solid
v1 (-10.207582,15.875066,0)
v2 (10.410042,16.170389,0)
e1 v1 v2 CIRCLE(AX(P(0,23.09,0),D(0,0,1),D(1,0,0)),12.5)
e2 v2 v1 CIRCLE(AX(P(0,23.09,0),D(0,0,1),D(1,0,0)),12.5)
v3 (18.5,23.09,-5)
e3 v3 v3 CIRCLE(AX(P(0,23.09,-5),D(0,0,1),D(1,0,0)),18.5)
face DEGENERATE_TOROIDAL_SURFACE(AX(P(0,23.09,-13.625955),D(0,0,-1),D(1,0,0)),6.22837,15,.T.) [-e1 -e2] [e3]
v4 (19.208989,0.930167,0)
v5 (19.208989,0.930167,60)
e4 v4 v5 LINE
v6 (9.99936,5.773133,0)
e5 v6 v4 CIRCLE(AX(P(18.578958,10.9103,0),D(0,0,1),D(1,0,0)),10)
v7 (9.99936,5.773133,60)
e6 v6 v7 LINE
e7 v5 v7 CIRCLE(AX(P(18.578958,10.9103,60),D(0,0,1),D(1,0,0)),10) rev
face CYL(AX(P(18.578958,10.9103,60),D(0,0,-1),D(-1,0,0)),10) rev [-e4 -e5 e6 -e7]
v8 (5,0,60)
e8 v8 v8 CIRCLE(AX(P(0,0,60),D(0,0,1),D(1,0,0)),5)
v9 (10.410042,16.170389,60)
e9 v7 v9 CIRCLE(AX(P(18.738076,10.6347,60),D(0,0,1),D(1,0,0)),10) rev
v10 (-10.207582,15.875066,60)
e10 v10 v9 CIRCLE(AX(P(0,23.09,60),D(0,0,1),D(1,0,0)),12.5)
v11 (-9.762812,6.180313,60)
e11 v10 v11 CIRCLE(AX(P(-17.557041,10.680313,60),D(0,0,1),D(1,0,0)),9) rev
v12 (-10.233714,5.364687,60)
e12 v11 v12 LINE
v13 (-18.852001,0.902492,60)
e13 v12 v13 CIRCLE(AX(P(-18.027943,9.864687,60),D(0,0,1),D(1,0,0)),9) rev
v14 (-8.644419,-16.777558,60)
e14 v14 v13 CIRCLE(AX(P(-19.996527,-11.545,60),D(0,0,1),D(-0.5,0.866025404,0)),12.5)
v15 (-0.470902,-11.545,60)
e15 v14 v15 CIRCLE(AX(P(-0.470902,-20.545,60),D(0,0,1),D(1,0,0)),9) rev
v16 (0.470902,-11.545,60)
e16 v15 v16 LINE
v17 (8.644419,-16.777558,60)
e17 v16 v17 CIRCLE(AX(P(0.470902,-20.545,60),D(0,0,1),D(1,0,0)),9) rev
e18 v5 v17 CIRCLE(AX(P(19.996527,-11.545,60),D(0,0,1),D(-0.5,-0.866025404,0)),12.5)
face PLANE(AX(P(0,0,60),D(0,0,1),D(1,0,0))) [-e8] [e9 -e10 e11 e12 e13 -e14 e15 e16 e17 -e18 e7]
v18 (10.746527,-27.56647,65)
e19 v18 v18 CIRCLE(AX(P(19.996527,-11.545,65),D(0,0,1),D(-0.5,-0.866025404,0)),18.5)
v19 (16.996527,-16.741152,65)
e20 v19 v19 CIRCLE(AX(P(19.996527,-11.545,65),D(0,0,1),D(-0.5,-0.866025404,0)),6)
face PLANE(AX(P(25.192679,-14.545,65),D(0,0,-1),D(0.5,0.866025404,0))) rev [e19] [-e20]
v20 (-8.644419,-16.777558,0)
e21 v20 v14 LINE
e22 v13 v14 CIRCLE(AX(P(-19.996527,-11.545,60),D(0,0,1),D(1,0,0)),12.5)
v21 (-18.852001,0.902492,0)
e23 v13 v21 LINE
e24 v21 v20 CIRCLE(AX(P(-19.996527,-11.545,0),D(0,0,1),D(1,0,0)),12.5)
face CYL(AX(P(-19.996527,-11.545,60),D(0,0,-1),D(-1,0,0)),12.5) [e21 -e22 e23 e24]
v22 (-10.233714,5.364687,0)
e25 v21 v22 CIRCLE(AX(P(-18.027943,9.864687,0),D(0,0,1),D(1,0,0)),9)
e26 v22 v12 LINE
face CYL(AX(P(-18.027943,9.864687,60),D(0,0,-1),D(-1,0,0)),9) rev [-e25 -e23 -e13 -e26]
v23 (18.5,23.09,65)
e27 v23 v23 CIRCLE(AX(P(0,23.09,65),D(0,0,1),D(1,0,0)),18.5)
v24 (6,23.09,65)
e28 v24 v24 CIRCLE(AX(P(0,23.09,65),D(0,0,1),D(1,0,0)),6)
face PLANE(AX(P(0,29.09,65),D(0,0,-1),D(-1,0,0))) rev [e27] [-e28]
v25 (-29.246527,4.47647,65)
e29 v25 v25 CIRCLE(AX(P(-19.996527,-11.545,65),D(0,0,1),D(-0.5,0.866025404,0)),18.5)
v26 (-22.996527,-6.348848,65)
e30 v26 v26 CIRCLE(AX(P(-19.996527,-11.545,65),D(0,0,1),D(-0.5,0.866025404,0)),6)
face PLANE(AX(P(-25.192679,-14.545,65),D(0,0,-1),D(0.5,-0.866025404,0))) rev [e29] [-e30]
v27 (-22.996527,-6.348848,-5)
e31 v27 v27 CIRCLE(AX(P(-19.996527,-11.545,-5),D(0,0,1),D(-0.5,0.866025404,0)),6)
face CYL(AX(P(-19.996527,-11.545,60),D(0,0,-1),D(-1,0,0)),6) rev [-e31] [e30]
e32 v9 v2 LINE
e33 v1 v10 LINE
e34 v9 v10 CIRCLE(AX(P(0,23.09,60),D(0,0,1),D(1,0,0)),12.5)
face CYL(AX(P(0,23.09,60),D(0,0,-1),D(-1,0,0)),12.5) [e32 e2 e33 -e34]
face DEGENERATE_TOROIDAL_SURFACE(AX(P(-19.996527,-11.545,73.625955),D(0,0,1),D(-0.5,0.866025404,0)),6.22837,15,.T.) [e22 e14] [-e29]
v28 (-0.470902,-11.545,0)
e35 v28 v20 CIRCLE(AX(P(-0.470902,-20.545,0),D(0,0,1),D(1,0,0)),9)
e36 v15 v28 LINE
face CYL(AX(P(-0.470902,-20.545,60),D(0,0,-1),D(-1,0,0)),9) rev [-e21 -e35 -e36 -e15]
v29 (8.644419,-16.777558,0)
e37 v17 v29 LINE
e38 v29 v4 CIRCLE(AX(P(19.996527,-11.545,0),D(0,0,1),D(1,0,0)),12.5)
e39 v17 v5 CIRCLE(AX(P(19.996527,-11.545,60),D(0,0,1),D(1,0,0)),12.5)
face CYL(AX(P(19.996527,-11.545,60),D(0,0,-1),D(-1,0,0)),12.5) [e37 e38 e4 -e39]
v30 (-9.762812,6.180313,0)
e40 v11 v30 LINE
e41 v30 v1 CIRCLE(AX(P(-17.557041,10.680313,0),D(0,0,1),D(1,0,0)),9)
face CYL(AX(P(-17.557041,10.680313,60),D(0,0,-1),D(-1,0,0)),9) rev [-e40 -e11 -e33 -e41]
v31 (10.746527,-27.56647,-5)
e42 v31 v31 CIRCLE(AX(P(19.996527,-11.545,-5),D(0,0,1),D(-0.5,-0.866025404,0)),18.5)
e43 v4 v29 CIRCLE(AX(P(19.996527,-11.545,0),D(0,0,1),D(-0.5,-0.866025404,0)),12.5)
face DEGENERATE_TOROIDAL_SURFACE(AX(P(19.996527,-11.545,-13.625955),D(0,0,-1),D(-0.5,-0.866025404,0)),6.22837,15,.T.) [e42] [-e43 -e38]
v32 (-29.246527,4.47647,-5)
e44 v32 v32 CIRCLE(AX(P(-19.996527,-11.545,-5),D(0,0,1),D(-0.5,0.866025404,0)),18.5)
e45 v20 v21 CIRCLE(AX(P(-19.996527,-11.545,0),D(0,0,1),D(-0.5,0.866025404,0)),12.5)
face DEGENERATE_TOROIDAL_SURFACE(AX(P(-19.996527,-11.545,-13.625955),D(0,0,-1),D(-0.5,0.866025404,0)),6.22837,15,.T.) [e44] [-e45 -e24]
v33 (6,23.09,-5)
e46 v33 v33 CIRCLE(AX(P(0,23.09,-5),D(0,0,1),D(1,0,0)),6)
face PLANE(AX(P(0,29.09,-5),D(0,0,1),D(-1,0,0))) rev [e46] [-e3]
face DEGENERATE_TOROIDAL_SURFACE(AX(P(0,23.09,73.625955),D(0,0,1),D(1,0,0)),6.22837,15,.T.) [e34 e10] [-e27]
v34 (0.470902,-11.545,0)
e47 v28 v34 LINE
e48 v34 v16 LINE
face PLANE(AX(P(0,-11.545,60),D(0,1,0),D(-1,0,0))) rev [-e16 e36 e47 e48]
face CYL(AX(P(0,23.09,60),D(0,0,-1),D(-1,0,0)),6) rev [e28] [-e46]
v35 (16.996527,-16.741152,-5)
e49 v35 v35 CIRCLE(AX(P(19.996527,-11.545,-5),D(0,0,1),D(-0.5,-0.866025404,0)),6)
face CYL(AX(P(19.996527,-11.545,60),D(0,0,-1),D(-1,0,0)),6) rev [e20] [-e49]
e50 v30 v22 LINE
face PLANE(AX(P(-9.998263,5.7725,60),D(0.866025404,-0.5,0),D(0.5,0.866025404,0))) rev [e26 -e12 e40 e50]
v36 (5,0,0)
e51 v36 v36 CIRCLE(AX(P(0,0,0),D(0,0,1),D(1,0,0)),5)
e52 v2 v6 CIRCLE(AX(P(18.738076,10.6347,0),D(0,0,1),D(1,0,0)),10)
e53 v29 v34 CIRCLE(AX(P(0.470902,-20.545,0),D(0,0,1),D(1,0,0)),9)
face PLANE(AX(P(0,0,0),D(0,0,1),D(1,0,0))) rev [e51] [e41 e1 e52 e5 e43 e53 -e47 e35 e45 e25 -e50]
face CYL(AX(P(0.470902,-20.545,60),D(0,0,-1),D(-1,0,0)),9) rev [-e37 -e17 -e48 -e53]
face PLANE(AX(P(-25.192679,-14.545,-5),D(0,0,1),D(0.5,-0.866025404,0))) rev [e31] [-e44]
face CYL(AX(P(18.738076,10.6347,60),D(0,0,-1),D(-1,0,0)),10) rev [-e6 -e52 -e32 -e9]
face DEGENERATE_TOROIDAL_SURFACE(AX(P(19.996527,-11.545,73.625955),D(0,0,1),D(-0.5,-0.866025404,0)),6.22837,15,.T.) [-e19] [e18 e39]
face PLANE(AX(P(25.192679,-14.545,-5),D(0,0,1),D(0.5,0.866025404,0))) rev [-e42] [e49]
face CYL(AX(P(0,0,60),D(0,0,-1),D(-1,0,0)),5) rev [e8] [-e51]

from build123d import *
from build123d.topology import SkipClean

# Parameters (mm, degrees)
SKETCH1_R           = 6
SKETCH1_R_2         = 5
BOSS_EXTRUDE1_DEPTH = 60
FILLET1_R           = 10
FILLET2_R           = 9
CIRPATTERN1_COUNT   = 3


with BuildPart() as part:
    # Sketch1 → Boss-Extrude1 (new body)
    with BuildSketch(Plane.XY):
        with BuildLine():
            ThreePointArc((7.496526573, -11.545), (30.821844121, -17.795), (13.746526573, -0.719682453))
            Line((13.746526573, -0.719682453), (6.25, 12.264682453))
            ThreePointArc((6.25, 12.264682453), (0, 35.59), (-6.25, 12.264682453))
            Line((-6.25, 12.264682453), (-13.746526573, -0.719682453))
            ThreePointArc((-13.746526573, -0.719682453), (-30.821844121, -17.795), (-7.496526573, -11.545))
            Line((-7.496526573, -11.545), (7.496526573, -11.545))
        make_face()
        with Locations((19.996526573, -11.545)):
            Circle(SKETCH1_R, mode=Mode.SUBTRACT)
        with Locations((0, 23.09)):
            Circle(SKETCH1_R, mode=Mode.SUBTRACT)
        Circle(SKETCH1_R_2, mode=Mode.SUBTRACT)
        with Locations((-19.996526573, -11.545)):
            Circle(SKETCH1_R, mode=Mode.SUBTRACT)
    extrude(amount=BOSS_EXTRUDE1_DEPTH)

    # Fillet1
    # the kernel refuses this fillet: 10 mm, written as the material it adds along each edge
    with BuildSketch(Plane(origin=(13.746526573, -0.719682453, 0), x_dir=(0.9572887202141619, 0.28913371673108657, 0), z_dir=(0, 0, 1))) as fillet1_piece_1:
        with BuildLine():
            CenterArc((7.988652571, 9.736032088), FILLET1_R, 193.193899981, 63.612200039)
            Line((-1.747379517, 7.453559925), (0, 0))
            ThreePointArc((0, 0), (2.853090204, 0.32995989), (5.706180408, 0))
        make_face()
    extrude(amount=60)
    with BuildSketch(Plane(origin=(6.25, 12.264682453, 0), x_dir=(0.4999999999999975, -0.86602540378444, 0), z_dir=(0, 0, 1))) as fillet1_piece_2:
        with BuildLine():
            CenterArc((7.655644371, 10), FILLET1_R, 206.387799961, 63.612200039)
            ThreePointArc((-1.302419794, 5.555555556), (-0.32995989, 2.853090204), (0, 0))
            Line((0, 0), (7.655644371, 0))
        make_face()
    extrude(amount=60)

    # Fillet2
    fillet2_edges = [part.edges().sort_by_distance(p)[0] for p in [
        (7.496526573, -11.545, 30),
        (-7.496526573, -11.545, 30),
        (-13.746526573, -0.719682453, 30),
        (-6.25, 12.264682453, 30),
    ]]
    fillet(fillet2_edges, radius=FILLET2_R)

    # Sketch2 → Revolve3 (revolve)
    with BuildSketch(Plane(origin=(0, 0, 0), x_dir=(0, 0, -1), z_dir=(1, 0, 0)), mode=Mode.PRIVATE) as revolve3_sk:
        with BuildLine():
            Line((-60, 35.59), (-60, 29.09))
            Line((-60, 29.09), (-65, 29.09))
            Line((-65, 29.09), (-65, 41.59))
            ThreePointArc((-65, 41.59), (-62.102636282, 38.921136432), (-60, 35.59))
        make_face()
    revolve3 = revolve(revolve3_sk.sketch.rotate(Axis((0, 23.09, 60), (0, 0, -1)), 90), axis=Axis((0, 23.09, 60), (0, 0, -1)))

    # CirPattern1: Revolve3 ×3 about axis
    with SkipClean():  # the faces are left unmerged after this step: merging them gives an invalid solid
        cirpattern1_axis = Axis((0, 0, 0), (0, 0, 1))
        for i in range(1, CIRPATTERN1_COUNT):
            add(revolve3.rotate(cirpattern1_axis, i * 360 / CIRPATTERN1_COUNT))

    # Mirror1: Revolve3 across plane
    with SkipClean():  # the faces are left unmerged after this step: merging them gives an invalid solid
        add(revolve3.mirror(Plane.XY.offset(30)))

    # Mirror1 copy 1 sketch → Mirror1 copy 1 (revolve)
    with SkipClean():  # the faces are left unmerged after this step: merging them gives an invalid solid
        with BuildSketch(Plane(origin=(0, 0, 60), x_dir=(0, 0, 1), z_dir=(-0.4999999999999998, 0.8660254037844387, 0))):
            with BuildLine():
                Line((-60, -35.59), (-60, -29.09))
                Line((-60, -29.09), (-65, -29.09))
                Line((-65, -29.09), (-65, -41.59))
                ThreePointArc((-65, -41.59), (-62.102636282, -38.921136432), (-60, -35.59))
            make_face()
        revolve(axis=Axis((-19.996526573, -11.545, 0), (0, 0, -1)))

    # Mirror1 copy 2 sketch → Mirror1 copy 2 (revolve)
    with SkipClean():  # the faces are left unmerged after this step: merging them gives an invalid solid
        with BuildSketch(Plane(origin=(0, 0, 60), x_dir=(0, 0, 1), z_dir=(-0.5000000000000004, -0.8660254037844384, 0))):
            with BuildLine():
                Line((-60, -35.59), (-60, -29.09))
                Line((-60, -29.09), (-65, -29.09))
                Line((-65, -29.09), (-65, -41.59))
                ThreePointArc((-65, -41.59), (-62.102636282, -38.921136432), (-60, -35.59))
            make_face()
        revolve(axis=Axis((19.996526573, -11.545, 0), (0, 0, -1)))


solid = part.part
